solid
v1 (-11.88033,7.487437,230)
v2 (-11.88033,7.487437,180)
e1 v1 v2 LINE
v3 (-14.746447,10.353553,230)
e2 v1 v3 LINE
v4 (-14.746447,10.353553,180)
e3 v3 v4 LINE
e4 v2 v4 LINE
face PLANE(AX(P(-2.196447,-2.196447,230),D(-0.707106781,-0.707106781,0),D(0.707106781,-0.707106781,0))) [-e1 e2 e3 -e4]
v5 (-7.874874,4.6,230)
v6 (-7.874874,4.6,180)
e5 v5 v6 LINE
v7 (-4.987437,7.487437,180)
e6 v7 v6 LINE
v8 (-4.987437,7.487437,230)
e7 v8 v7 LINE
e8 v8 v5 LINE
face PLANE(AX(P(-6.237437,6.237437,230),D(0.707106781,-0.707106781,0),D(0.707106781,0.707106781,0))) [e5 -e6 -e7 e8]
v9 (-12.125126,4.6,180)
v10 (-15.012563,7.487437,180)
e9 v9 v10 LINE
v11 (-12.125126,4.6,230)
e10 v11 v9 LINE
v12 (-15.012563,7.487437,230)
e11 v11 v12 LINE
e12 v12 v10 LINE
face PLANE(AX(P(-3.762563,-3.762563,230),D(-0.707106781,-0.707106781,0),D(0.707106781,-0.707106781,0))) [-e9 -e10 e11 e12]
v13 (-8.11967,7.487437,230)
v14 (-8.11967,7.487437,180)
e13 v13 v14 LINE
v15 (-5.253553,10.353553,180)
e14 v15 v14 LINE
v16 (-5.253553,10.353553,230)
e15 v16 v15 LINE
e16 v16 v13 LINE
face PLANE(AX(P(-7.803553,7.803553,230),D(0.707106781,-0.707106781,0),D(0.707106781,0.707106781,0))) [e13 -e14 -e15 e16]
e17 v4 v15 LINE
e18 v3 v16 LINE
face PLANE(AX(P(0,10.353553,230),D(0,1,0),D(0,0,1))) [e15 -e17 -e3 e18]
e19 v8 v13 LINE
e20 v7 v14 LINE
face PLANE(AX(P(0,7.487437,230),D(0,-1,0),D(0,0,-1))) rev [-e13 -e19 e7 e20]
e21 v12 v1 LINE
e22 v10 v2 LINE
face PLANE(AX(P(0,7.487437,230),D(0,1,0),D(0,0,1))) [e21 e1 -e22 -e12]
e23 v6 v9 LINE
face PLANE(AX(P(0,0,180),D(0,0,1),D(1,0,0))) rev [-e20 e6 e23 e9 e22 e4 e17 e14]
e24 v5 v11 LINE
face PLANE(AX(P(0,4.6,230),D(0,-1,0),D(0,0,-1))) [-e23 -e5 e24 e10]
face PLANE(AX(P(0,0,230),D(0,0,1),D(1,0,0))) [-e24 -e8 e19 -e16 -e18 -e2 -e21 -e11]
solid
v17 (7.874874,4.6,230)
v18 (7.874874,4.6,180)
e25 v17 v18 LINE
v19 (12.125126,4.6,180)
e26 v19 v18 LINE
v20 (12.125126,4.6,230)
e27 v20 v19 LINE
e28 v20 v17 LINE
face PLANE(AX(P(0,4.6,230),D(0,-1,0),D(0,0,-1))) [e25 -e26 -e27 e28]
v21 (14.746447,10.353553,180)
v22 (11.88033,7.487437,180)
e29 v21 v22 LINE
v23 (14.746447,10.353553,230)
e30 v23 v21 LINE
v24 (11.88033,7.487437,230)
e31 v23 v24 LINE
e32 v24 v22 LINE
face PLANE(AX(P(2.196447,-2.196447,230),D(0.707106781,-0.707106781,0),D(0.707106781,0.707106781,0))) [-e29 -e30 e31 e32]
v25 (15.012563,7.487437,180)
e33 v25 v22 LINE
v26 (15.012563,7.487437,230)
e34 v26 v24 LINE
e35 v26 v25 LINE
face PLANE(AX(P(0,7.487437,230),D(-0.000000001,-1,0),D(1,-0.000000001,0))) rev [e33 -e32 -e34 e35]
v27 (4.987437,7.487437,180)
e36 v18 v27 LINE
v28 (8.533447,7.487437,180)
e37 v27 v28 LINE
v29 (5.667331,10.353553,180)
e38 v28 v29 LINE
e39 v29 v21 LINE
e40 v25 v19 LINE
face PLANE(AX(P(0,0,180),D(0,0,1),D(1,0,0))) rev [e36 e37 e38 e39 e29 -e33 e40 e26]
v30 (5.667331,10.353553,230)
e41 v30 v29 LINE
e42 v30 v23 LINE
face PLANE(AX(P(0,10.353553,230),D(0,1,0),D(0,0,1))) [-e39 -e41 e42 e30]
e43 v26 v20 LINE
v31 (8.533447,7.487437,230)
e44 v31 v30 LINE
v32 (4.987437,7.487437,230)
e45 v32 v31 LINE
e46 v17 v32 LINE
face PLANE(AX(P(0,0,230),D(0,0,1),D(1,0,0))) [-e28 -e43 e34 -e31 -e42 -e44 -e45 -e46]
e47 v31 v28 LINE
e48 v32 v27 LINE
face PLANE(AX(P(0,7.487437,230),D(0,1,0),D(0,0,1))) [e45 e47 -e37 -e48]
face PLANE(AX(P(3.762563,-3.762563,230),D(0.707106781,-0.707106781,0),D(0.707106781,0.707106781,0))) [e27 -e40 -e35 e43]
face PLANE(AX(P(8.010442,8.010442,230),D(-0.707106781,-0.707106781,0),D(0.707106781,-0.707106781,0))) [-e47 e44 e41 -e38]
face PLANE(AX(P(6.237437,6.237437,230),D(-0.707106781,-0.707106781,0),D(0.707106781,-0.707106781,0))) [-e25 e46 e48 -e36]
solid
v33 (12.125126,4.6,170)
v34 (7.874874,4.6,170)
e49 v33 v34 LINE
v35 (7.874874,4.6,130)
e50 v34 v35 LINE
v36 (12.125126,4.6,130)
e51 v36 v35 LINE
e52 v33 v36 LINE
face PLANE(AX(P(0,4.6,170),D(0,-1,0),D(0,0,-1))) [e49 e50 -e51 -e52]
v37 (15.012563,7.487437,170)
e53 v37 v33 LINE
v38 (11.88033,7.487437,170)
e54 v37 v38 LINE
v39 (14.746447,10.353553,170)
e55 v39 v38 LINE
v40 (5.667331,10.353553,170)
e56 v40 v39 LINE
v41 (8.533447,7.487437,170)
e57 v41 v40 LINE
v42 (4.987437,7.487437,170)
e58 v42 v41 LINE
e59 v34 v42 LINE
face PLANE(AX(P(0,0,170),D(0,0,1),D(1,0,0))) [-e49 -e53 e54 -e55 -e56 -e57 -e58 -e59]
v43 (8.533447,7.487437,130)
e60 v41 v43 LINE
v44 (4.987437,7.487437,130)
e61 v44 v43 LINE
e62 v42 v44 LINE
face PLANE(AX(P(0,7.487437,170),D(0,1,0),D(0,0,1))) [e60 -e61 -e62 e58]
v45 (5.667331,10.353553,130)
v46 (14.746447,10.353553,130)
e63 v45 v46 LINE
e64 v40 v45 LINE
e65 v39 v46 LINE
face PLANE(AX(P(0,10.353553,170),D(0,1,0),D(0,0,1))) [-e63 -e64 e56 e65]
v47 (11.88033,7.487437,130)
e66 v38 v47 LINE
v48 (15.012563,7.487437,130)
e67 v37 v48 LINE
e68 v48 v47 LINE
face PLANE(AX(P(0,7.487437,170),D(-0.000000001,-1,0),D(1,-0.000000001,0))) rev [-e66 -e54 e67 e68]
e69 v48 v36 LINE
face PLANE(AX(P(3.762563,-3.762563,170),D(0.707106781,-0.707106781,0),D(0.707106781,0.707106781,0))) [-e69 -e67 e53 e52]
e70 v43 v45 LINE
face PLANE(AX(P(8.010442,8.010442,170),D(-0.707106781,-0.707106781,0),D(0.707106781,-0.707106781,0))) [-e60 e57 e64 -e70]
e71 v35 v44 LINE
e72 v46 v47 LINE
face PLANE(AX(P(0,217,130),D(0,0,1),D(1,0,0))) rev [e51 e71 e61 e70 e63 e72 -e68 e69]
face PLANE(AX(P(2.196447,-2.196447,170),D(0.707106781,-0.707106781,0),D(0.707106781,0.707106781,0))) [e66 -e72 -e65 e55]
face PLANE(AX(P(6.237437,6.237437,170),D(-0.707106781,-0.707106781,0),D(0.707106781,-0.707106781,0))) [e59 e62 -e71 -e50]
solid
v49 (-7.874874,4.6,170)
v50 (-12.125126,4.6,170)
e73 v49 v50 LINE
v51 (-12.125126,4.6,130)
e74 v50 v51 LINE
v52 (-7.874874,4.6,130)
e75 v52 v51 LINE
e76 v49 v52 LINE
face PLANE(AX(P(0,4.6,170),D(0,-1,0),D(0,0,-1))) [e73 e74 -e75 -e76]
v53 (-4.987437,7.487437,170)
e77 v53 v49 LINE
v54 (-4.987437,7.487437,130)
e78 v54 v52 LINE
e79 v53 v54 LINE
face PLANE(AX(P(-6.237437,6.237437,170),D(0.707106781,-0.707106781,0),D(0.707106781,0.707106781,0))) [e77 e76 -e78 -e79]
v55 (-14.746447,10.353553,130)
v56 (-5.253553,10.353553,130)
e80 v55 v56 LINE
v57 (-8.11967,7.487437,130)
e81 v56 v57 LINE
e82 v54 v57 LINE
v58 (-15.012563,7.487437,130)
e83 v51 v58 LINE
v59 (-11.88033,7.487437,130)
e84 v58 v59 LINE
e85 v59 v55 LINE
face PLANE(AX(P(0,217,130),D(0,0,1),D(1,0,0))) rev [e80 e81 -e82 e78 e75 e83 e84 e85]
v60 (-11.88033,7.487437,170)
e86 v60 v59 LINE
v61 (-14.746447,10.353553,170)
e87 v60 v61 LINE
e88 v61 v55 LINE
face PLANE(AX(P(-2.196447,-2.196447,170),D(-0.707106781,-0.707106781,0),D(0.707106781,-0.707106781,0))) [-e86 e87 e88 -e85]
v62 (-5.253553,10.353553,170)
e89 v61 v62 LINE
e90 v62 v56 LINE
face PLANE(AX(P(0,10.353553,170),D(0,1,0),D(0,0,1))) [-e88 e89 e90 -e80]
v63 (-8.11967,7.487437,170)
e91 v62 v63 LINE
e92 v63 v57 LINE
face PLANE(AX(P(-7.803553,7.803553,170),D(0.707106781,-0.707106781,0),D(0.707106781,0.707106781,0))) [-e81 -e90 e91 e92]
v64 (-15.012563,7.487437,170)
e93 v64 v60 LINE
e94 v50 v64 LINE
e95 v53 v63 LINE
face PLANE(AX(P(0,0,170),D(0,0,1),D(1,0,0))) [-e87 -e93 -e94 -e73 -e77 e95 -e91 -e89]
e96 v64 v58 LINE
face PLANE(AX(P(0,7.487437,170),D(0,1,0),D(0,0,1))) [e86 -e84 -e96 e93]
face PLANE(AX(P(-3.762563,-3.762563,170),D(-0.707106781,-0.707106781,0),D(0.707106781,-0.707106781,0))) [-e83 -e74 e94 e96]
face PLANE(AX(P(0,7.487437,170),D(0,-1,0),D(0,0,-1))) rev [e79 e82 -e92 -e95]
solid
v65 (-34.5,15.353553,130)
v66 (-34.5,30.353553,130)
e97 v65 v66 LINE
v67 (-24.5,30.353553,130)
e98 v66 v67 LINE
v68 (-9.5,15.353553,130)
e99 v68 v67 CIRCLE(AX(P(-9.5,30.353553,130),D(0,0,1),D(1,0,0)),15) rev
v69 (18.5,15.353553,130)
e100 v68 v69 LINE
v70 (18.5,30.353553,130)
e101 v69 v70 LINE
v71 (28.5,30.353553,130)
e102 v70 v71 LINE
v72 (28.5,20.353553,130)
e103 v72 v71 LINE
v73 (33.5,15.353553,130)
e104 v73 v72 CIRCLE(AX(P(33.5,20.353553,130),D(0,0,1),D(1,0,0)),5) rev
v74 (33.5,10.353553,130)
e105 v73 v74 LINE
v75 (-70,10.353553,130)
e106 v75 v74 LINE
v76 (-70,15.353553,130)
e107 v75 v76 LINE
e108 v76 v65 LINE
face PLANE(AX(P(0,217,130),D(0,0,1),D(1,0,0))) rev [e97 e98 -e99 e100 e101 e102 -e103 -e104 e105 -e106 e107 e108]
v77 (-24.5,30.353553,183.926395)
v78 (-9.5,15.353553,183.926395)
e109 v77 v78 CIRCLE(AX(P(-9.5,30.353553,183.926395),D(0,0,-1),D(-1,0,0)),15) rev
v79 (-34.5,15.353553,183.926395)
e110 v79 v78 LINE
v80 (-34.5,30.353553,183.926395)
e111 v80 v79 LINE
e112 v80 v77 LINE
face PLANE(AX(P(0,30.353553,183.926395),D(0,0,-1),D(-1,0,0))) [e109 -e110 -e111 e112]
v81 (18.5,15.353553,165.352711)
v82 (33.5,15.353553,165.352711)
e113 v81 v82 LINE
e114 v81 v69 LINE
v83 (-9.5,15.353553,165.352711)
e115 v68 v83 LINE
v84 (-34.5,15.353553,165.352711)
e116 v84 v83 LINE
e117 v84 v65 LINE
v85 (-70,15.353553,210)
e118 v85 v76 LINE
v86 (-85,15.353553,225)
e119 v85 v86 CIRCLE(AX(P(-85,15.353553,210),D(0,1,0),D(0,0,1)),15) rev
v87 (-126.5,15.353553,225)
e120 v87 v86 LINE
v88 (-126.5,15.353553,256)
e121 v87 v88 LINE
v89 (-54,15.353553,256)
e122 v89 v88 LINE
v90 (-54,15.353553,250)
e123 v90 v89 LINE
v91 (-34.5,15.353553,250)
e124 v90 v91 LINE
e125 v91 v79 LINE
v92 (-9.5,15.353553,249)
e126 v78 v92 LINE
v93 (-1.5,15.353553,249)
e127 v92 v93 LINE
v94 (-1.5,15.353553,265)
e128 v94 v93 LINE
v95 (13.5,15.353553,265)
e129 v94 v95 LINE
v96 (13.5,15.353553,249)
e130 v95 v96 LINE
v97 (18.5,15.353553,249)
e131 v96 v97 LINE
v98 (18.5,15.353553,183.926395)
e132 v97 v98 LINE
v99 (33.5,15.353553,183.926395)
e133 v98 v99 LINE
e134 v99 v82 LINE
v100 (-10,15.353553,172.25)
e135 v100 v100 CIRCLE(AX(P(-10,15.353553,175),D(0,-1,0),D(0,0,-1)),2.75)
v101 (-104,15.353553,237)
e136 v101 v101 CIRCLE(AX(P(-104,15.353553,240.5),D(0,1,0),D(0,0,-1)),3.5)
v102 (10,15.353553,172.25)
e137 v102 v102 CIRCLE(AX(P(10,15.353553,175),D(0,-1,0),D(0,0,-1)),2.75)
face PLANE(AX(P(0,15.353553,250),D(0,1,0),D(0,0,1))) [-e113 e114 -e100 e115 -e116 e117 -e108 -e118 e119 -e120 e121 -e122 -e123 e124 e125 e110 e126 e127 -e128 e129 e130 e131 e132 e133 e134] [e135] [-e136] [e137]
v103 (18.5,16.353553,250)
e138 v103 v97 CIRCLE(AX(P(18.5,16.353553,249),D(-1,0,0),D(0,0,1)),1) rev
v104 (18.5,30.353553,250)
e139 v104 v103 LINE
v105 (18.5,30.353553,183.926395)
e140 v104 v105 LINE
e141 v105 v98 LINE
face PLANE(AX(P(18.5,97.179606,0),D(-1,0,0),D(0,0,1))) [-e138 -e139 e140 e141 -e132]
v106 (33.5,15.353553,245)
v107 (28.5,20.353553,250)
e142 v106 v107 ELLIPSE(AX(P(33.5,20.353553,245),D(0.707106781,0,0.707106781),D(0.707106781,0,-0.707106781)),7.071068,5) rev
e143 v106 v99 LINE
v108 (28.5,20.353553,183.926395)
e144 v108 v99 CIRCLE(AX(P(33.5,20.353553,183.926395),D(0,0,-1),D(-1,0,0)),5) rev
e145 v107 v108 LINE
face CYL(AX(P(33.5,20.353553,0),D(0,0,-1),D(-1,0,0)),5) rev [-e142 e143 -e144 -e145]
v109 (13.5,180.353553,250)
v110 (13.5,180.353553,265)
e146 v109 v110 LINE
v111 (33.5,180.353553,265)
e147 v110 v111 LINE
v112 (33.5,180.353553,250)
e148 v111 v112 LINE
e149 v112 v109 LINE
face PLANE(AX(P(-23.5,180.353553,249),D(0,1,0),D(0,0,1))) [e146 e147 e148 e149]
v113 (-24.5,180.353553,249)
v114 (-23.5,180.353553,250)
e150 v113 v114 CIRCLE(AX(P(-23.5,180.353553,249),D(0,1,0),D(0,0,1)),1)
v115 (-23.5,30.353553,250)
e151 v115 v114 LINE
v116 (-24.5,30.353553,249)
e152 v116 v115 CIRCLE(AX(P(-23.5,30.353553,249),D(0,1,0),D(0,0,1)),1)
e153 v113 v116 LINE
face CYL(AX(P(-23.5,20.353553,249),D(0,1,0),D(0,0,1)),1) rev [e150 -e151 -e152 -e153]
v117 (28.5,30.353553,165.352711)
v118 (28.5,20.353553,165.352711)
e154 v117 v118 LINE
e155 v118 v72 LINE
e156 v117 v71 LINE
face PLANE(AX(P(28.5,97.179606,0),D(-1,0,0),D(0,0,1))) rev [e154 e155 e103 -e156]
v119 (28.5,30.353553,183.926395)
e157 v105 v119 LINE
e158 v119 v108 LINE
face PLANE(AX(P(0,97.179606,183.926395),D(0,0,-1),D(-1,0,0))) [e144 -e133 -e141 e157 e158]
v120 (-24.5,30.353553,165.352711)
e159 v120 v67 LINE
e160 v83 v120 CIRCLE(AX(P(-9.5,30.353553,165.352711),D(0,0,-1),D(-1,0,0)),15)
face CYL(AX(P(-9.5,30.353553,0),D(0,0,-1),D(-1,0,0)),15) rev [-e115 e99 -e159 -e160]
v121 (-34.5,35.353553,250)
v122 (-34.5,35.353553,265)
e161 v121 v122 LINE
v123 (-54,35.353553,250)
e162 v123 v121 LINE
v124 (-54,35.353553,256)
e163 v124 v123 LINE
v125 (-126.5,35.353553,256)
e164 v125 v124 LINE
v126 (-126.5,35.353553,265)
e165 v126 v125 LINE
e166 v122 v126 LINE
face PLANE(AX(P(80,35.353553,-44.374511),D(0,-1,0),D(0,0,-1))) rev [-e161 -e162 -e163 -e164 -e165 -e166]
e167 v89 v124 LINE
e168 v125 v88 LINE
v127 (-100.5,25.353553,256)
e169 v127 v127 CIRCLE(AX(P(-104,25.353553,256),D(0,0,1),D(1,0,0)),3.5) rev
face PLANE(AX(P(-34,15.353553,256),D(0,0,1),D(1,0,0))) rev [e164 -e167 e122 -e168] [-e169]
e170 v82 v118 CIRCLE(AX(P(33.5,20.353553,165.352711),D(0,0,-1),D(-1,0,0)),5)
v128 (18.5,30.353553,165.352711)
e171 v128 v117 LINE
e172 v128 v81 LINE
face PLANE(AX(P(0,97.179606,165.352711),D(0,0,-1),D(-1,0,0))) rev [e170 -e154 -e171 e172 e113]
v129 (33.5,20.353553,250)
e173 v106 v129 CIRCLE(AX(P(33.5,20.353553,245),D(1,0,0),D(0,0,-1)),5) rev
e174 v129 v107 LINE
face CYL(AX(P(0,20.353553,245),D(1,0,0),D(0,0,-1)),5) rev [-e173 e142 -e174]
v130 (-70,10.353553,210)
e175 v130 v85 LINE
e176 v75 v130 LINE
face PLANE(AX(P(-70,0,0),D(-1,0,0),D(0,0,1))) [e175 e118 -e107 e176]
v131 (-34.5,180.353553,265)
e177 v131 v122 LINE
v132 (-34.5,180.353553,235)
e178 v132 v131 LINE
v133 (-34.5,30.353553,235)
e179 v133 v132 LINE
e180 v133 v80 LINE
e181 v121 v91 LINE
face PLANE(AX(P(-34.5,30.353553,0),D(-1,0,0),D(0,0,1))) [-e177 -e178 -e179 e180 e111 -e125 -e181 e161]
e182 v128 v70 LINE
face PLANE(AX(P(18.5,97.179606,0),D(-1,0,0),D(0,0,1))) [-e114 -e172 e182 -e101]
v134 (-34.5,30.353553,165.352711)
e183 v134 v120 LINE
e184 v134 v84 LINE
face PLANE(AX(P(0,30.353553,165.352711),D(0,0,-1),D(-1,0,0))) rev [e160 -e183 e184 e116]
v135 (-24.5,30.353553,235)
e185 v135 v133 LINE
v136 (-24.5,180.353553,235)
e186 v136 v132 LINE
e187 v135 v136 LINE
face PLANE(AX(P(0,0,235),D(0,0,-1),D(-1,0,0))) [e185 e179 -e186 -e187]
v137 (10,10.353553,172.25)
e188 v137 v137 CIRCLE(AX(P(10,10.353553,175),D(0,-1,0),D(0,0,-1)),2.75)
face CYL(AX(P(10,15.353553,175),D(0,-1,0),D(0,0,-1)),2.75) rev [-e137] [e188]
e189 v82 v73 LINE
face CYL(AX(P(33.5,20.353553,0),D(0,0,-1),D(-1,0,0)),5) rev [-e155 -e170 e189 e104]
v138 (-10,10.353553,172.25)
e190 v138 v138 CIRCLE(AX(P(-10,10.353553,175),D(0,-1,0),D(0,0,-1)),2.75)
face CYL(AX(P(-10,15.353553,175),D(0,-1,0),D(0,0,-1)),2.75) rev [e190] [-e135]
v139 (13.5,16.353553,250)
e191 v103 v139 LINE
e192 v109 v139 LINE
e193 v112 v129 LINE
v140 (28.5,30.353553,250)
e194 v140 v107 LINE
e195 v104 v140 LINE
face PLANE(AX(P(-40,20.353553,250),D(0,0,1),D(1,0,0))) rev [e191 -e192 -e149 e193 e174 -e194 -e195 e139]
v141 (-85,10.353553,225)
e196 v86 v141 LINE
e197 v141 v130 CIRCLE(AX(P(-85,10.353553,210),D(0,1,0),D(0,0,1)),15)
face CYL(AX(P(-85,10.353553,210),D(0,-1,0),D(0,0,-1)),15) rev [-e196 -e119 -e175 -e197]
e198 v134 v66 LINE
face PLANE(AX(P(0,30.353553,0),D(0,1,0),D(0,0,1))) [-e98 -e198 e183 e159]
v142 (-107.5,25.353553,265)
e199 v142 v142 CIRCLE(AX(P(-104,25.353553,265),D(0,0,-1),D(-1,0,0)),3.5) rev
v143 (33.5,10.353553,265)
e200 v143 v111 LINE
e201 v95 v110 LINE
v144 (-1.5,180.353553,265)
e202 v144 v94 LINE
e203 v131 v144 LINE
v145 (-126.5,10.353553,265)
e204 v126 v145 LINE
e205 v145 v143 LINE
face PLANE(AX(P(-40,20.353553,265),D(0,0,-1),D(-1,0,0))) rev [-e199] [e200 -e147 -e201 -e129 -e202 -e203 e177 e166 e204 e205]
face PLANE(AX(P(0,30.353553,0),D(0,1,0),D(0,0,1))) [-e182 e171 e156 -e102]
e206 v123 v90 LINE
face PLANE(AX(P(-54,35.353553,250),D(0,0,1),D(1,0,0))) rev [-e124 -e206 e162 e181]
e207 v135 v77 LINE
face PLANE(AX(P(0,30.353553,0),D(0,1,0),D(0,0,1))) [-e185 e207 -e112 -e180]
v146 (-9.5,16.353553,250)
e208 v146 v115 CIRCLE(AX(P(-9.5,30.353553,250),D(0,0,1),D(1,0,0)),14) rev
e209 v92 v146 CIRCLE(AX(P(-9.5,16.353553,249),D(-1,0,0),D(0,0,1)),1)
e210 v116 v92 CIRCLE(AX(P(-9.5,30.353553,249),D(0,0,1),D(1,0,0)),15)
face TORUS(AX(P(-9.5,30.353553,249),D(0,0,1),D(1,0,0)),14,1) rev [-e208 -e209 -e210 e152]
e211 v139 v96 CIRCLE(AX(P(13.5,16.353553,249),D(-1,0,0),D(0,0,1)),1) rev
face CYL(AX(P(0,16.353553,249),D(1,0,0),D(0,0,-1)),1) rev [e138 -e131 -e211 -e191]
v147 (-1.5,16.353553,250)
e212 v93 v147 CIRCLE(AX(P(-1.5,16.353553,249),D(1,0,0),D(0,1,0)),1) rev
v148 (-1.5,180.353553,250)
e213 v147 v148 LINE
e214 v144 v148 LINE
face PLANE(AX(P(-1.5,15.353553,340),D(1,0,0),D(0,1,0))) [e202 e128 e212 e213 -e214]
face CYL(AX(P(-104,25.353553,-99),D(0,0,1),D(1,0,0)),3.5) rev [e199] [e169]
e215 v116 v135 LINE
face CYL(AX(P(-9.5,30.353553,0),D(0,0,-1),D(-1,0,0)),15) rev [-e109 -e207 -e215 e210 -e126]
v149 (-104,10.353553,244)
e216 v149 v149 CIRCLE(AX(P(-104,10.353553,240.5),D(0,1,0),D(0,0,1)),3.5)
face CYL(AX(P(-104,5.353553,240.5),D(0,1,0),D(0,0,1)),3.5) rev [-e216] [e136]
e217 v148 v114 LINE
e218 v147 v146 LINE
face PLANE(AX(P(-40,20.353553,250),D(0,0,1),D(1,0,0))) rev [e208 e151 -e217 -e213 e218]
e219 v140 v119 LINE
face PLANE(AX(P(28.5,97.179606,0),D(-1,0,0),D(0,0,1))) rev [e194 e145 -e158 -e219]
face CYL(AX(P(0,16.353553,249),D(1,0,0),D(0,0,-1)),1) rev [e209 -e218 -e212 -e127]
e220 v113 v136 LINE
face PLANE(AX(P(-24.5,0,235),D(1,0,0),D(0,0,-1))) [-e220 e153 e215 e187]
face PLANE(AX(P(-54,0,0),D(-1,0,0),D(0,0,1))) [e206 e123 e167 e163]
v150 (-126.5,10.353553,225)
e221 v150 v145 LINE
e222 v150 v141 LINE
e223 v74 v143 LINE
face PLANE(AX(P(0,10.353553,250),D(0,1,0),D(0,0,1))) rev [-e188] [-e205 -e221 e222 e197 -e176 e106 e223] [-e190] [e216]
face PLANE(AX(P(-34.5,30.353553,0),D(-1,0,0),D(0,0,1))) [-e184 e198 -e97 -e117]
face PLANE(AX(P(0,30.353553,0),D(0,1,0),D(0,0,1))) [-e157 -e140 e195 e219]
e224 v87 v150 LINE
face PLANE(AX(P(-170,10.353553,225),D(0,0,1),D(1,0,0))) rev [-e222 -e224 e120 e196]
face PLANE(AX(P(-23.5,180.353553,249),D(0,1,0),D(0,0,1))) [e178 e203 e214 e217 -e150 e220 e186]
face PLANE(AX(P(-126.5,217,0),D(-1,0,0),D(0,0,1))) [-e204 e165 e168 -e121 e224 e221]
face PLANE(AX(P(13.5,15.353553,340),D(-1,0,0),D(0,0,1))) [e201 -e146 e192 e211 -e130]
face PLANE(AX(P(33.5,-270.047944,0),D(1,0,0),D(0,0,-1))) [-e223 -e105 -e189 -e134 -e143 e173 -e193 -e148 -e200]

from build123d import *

# Parameters (mm, degrees)
BOSS_EXTRUDE1_DEPTH      = 250
BOSS_EXTRUDE2_DEPTH      = 50
BOSS_EXTRUDE2_2_DEPTH    = 50
LPATTERN1_COUNT          = 4
LPATTERN1_PITCH          = 60
SKETCH2_R                = 2.75
CUT_EXTRUDE1_DEPTH       = 251.864711302
UPPER_ACRYLIC_SUPP_W     = 20
UPPER_ACRYLIC_SUPP_H     = 250
BOSS_EXTRUDE3_DEPTH      = 5
UPPER_ACRYLIC_SUPP_3_W   = 10
UPPER_ACRYLIC_SUPP_3_H   = 66.073604859
UPPER_ACRYLIC_SUPP_3_H_2 = 41.475217291
UPPER_ACRYLIC_SUPP_3_H_3 = 42.557179481
UPPER_ACRYLIC_SUPP_3_H_4 = 45.558340935
BOSS_EXTRUDE4_DEPTH      = 15
FILLET1_R                = 15
SKETCH4_W                = 60
SKETCH4_H                = 15
BOSS_EXTRUDE5_DEPTH      = 5
SKETCH4_3_W              = 60
SKETCH4_3_H              = 15
BOSS_EXTRUDE6_DEPTH      = 60
SKETCH5_W                = 10
SKETCH5_H                = 45
BOSS_EXTRUDE7_DEPTH      = 15
BOSS_EXTRUDE8_START      = 250
SKETCH5_3_W              = 10
SKETCH5_3_H              = 45
BOSS_EXTRUDE8_DEPTH      = 15
FILLET2_R                = 1
SKETCH6_W                = 6
SKETCH6_H                = 60
CUT_EXTRUDE2_DEPTH       = 6
BOSS_EXTRUDE9_DEPTH      = 30
SKETCH8_W                = 333.602701612
SKETCH8_H                = 59.031331047
CUT_EXTRUDE3_DEPTH       = 150
SKETCH9_W                = 6
SKETCH9_H                = 20
CLOTH_ESCAPE_GAP_DEPTH   = 20
SKETCH11_W               = 9
SKETCH11_H               = 20
BOSS_EXTRUDE11_DEPTH     = 100
CUT_EXTRUDE4_DEPTH       = 68
SKETCH13_W               = 40
SKETCH13_H               = 5
BOSS_EXTRUDE13_DEPTH     = 100
CUT_EXTRUDE5_DEPTH       = 100
FILLET3_R                = 15
BOSS_EXTRUDE14_START     = -5
BOSS_EXTRUDE14_DEPTH     = 25
CUT_EXTRUDE6_DEPTH       = 30
CUT_EXTRUDE6_DEPTH_BACK  = 10
SKETCH16_5_W             = 8.5
SKETCH16_5_H             = 41.475217291
SKETCH16_5_H_2           = 42.557179481
SKETCH16_5_W_2           = 1.5
SKETCH16_5_H_3           = 42.177819043
SKETCH16_5_H_4           = 20.831100018
SKETCH16_5_H_5           = 17.311395043
SKETCH16_5_H_6           = 18.573684265
SKETCH16_5_H_7           = 65.073604859
SKETCH16_6_W             = 8.5
SKETCH16_6_H             = 41.475217291
SKETCH16_6_H_2           = 42.557179481
SKETCH16_6_W_2           = 1.5
SKETCH16_6_H_3           = 42.177819043
SKETCH16_6_H_4           = 20.831100018
SKETCH16_6_H_5           = 17.311395043
SKETCH16_6_H_6           = 18.573684265
SKETCH16_6_H_7           = 65.073604859
BOSS_EXTRUDE15_DEPTH     = 5
BOSS_EXTRUDE16_DEPTH     = 20
SKETCH16_8_W             = 8.5
SKETCH16_8_H             = 41.475217291
SKETCH16_8_H_2           = 42.557179481
SKETCH16_8_W_2           = 1.5
SKETCH16_8_H_3           = 42.177819043
SKETCH16_8_H_4           = 65.073604859
BOSS_EXTRUDE17_DEPTH     = 15
BOSS_EXTRUDE18_START     = -5
BOSS_EXTRUDE18_DEPTH     = 25
FILLET4_R                = 5
BOSS_EXTRUDE21_START     = 145
BOSS_EXTRUDE21_DEPTH     = 170
SKETCH19_R               = 3.5
CUT_EXTRUDE7_DEPTH       = 10
CUT_EXTRUDE8_DEPTH       = 355
CUT_EXTRUDE8_DEPTH_BACK  = 10
SKETCH20_R               = 3.5
SKETCH21_W               = 15
SKETCH21_H               = 197.501027769
CUT_EXTRUDE9_DEPTH       = 340
SKETCH22_W               = 160
SKETCH22_H               = 10
SKETCH22_H_2             = 135
CUT_EXTRUDE11_DEPTH      = 217


with BuildPart() as part:
    # profile → Boss-Extrude1 (new body)
    with BuildSketch(Plane.XY):
        Polygon((-14.746446609, 10.353553391), (-5.253553391, 10.353553391), (5.667330529, 10.353553391), (14.746446609, 10.353553391), (20, 10.353553391), (20, 15.353553391), (-20, 15.353553391), (-20, 10.353553391), align=None)
    extrude(amount=BOSS_EXTRUDE1_DEPTH)

    # Sketch2 → Cut-Extrude1 (cut, through all)
    with BuildSketch(Plane.XZ.offset(-10.353553391)):
        with Locations(Location((-10, 175, 0), (0, 0, 270))):
            Circle(SKETCH2_R)
        with Locations(Location((10, 175, 0), (0, 0, 270))):
            Circle(SKETCH2_R)
        with Locations(Location((-10, 115, 0), (0, 0, 270))):
            Circle(SKETCH2_R)
        with Locations(Location((10, 115, 0), (0, 0, 270))):
            Circle(SKETCH2_R)
        with Locations(Location((-10, 55, 0), (0, 0, 270))):
            Circle(SKETCH2_R)
        with Locations(Location((10, 55, 0), (0, 0, 270))):
            Circle(SKETCH2_R)
    extrude(amount=-CUT_EXTRUDE1_DEPTH, mode=Mode.SUBTRACT)

    # upper_acrylic_supp → Boss-Extrude3 (add)
    with BuildSketch(Plane(origin=(0, 15.353553391, 0), x_dir=(1, 0, 0), z_dir=(0, 1, 0))):
        with Locations((-30, -125)):
            Rectangle(UPPER_ACRYLIC_SUPP_W, UPPER_ACRYLIC_SUPP_H)
    extrude(amount=-BOSS_EXTRUDE3_DEPTH)

    # upper_acrylic_supp<3> → Boss-Extrude4 (add)
    with BuildSketch(Plane(origin=(0, 15.353553391, 0), x_dir=(1, 0, 0), z_dir=(0, 1, 0))):
        with Locations((-29.5, -216.963197571)):
            Rectangle(UPPER_ACRYLIC_SUPP_3_W, UPPER_ACRYLIC_SUPP_3_H)
        with Locations((-29.5, -144.615102231)):
            Rectangle(UPPER_ACRYLIC_SUPP_3_W, UPPER_ACRYLIC_SUPP_3_H_2)
        with Locations((-29.5, -85.287508801)):
            Rectangle(UPPER_ACRYLIC_SUPP_3_W, UPPER_ACRYLIC_SUPP_3_H_3)
        with Locations((-29.5, -22.779170468)):
            Rectangle(UPPER_ACRYLIC_SUPP_3_W, UPPER_ACRYLIC_SUPP_3_H_4)
    extrude(amount=BOSS_EXTRUDE4_DEPTH)

    # Fillet1
    fillet1_edges = [part.edges().sort_by_distance(p)[0] for p in [
        (-24.5, 15.353553391, 22.779170467),
        (-24.5, 15.353553391, 85.287508801),
        (-24.5, 15.353553391, 144.615102231),
        (-24.5, 15.353553391, 216.963197571),
    ]]
    fillet(fillet1_edges, radius=FILLET1_R - 0.0001)  # a hair under: the kernel refuses the full size



with BuildPart() as body_2:
    # Sketch1<3> → Boss-Extrude2 (new body)
    with BuildSketch(Plane.XY):
        Polygon((-7.253553391, 8.353553391), (-8.119669914, 7.487436867), (-5.5, 7.487436867), (-4.987436867, 7.487436867), (-5.5, 6.974873734), (-7.874873734, 4.6), (-12.125126266, 4.6), (-14.5, 6.974873734), (-15.012563133, 7.487436867), (-14.5, 7.487436867), (-11.880330086, 7.487436867), (-12.746446609, 8.353553391), (-14.746446609, 10.353553391), (-5.253553391, 10.353553391), align=None)
    boss_extrude2 = extrude(amount=BOSS_EXTRUDE2_DEPTH)


with BuildPart() as body_3:
    # Sketch1<3> → Boss-Extrude2 2 (new body)
    with BuildSketch(Plane.XY):
        Polygon((12.746446609, 8.353553391), (11.880330086, 7.487436867), (14.5, 7.487436867), (15.012563133, 7.487436867), (14.5, 6.974873734), (12.125126266, 4.6), (7.874873734, 4.6), (5.5, 6.974873734), (4.987436867, 7.487436867), (5.5, 7.487436867), (8.533447053, 7.487436867), (7.667330529, 8.353553391), (5.667330529, 10.353553391), (14.746446609, 10.353553391), align=None)
    boss_extrude2_2 = extrude(amount=BOSS_EXTRUDE2_2_DEPTH)


with BuildPart() as lpattern1_1:
    # LPattern1: pattern copy
    add(boss_extrude2.moved(Location(Vector(0, 0, 1) * (1 * LPATTERN1_PITCH))))


with BuildPart() as lpattern1_2:
    # LPattern1: pattern copy
    add(boss_extrude2.moved(Location(Vector(0, 0, 1) * (2 * LPATTERN1_PITCH))))


with BuildPart() as lpattern1_3:
    # LPattern1: pattern copy
    add(boss_extrude2.moved(Location(Vector(0, 0, 1) * (3 * LPATTERN1_PITCH))))


with BuildPart() as lpattern1_4:
    # LPattern1: pattern copy
    add(boss_extrude2_2.moved(Location(Vector(0, 0, 1) * (1 * LPATTERN1_PITCH))))


with BuildPart() as lpattern1_5:
    # LPattern1: pattern copy
    add(boss_extrude2_2.moved(Location(Vector(0, 0, 1) * (2 * LPATTERN1_PITCH))))


with BuildPart() as lpattern1_6:
    # LPattern1: pattern copy
    add(boss_extrude2_2.moved(Location(Vector(0, 0, 1) * (3 * LPATTERN1_PITCH))))


with BuildPart() as part_1:
    add(part.part)

    add(body_2.part)  # Boss-Extrude5 merges body 2

    add(body_3.part)  # Boss-Extrude5 merges body 3
    # Sketch4 → Boss-Extrude5 (add, symmetric)
    with BuildSketch(Plane(origin=(0, 15.353553391, 0), x_dir=(1, 0, 0), z_dir=(0, 1, 0))):
        with Locations((-10, -257.5)):
            Rectangle(SKETCH4_W, SKETCH4_H)
        with Locations((-10, 7.5)):
            Rectangle(SKETCH4_W, SKETCH4_H)
    extrude(amount=BOSS_EXTRUDE5_DEPTH, both=True)

    # Sketch4<3> → Boss-Extrude6 (add)
    with BuildSketch(Plane(origin=(0, 15.353553391, 0), x_dir=(1, 0, 0), z_dir=(0, 1, 0))):
        with Locations((-10, -257.5)):
            Rectangle(SKETCH4_3_W, SKETCH4_3_H)
        with Locations((-10, 7.5)):
            Rectangle(SKETCH4_3_W, SKETCH4_3_H)
    extrude(amount=BOSS_EXTRUDE6_DEPTH)

    # Sketch5 → Boss-Extrude7 (add)
    with BuildSketch(Plane(origin=(0, 0, 250), x_dir=(-1, 0, 0), z_dir=(0, 0, -1))):
        with Locations((29.5, 52.853553391)):
            Rectangle(SKETCH5_W, SKETCH5_H)
    extrude(amount=BOSS_EXTRUDE7_DEPTH)

    # Sketch5<3> → Boss-Extrude8 (add)
    with BuildSketch(Plane(origin=(0, 0, 250), x_dir=(-1, 0, 0), z_dir=(0, 0, -1)).offset(BOSS_EXTRUDE8_START)):
        with Locations((29.5, 52.853553391)):
            Rectangle(SKETCH5_3_W, SKETCH5_3_H)
    extrude(amount=-BOSS_EXTRUDE8_DEPTH)

    # Fillet2
    fillet2_edges = [part_1.edges().sort_by_distance(p)[0] for p in [
        (-24.5, 52.853503391, 250),
        (-24.5, 52.853503391, 0),
        (5.24995, 15.353553391, 250),
        (-20.106631007, 19.746922384, 250),
        (-20.106631007, 19.746922384, 0),
        (5.24995, 15.353553391, 0),
    ]]
    fillet(fillet2_edges, radius=FILLET2_R)

    # Sketch6 → Cut-Extrude2 (cut)
    with BuildSketch(Plane.ZY.offset(40)):
        with Locations((253, 45.353553391)):
            Rectangle(SKETCH6_W, SKETCH6_H)
        with Locations((-3, 45.353553391)):
            Rectangle(SKETCH6_W, SKETCH6_H)
    extrude(amount=-CUT_EXTRUDE2_DEPTH, mode=Mode.SUBTRACT)

    # Sketch7 → Boss-Extrude9 (add)
    with BuildSketch(Plane.ZY.offset(40)):
        Polygon((265, 75.353553391), (256, 75.353553391), (256, 15.353553391), (-6, 15.353553391), (-6, 75.353553391), (-15, 75.353553391), (-15, 10.353553391), (265, 10.353553391), align=None)
    extrude(amount=BOSS_EXTRUDE9_DEPTH)

    # Sketch8 → Cut-Extrude3 (cut)
    with BuildSketch(Plane.ZY.offset(70)):
        with Locations((122.426839416, 64.869218915)):
            Rectangle(SKETCH8_W, SKETCH8_H)
    extrude(amount=-CUT_EXTRUDE3_DEPTH, mode=Mode.SUBTRACT)

    # Sketch9 → cloth_escape_gap (add)
    with BuildSketch(Plane.ZY.offset(34)):
        with Locations((253, 25.353553391)):
            Rectangle(SKETCH9_W, SKETCH9_H)
        with Locations((-3, 25.353553391)):
            Rectangle(SKETCH9_W, SKETCH9_H)
    extrude(amount=CLOTH_ESCAPE_GAP_DEPTH)

    # Sketch11 → Boss-Extrude11 (add)
    with BuildSketch(Plane.ZY.offset(70)):
        with Locations((-10.5, 25.353553391)):
            Rectangle(SKETCH11_W, SKETCH11_H)
        with Locations((260.5, 25.353553391)):
            Rectangle(SKETCH11_W, SKETCH11_H)
    extrude(amount=BOSS_EXTRUDE11_DEPTH)

    # Sketch12 → Cut-Extrude4 (cut)
    with BuildSketch(Plane.XZ.offset(-10.353553391)):
        Polygon((-170, 265), (-70, 265), (-170, 260.5), align=None)
        Polygon((-70, -15), (-170, -10.5), (-170, -15), align=None)
    extrude(amount=-CUT_EXTRUDE4_DEPTH, mode=Mode.SUBTRACT)

    # Sketch13 → Boss-Extrude13 (add)
    with BuildSketch(Plane.ZY.offset(70)):
        with Locations((5, 12.853553391)):
            Rectangle(SKETCH13_W, SKETCH13_H)
        with Locations((245, 12.853553391)):
            Rectangle(SKETCH13_W, SKETCH13_H)
    extrude(amount=BOSS_EXTRUDE13_DEPTH)

    # Sketch14 → Cut-Extrude5 (cut)
    with BuildSketch(Plane(origin=(0, 15.353553391, 0), x_dir=(1, 0, 0), z_dir=(0, 1, 0))):
        Polygon((-70, -265), (-170, -260.5), (-170, -265), align=None)
        Polygon((-170, 15), (-170, 10.5), (-70, 15), align=None)
    extrude(amount=-CUT_EXTRUDE5_DEPTH, mode=Mode.SUBTRACT)

    # Fillet3
    fillet3_edges = [part_1.edges().sort_by_distance(p)[0] for p in [
        (-70, 12.853553391, 25),
        (-70, 12.853553391, 225),
    ]]
    fillet(fillet3_edges, radius=FILLET3_R)

    # Sketch16 → Boss-Extrude14 (add)
    with BuildSketch(Plane(origin=(0, 15.353553391, 0), x_dir=(1, 0, 0), z_dir=(0, 1, 0)).offset(BOSS_EXTRUDE14_START)):
        Polygon((28.5, 0), (33.5, 0), (33.5, 15), (18.5, 15), (18.5, 0), align=None)
        Polygon((18.5, -250), (18.5, -265), (33.5, -265), (33.5, -250), (28.5, -250), align=None)
    extrude(amount=BOSS_EXTRUDE14_DEPTH)

    # Sketch16<5> → Cut-Extrude6 (cut, two sides: drawn at the far end of the back side and taken through both)
    with BuildSketch(Plane(origin=(0, 15.353553391, 0), x_dir=(1, 0, 0), z_dir=(0, 1, 0)).offset(-CUT_EXTRUDE6_DEPTH_BACK)):
        Polygon((18.5, -250), (18.5, -265), (33.5, -265), (33.5, -250), (28.5, -250), align=None)
        Polygon((28.5, -250), (33.5, -250), (33.5, 0), (28.5, 0), (28.5, -43.177819043), (20, -43.177819043), (20, -64.008919061), (28.5, -64.008919061), (28.5, -106.566098542), (20, -106.566098542), (20, -123.877493585), (28.5, -123.877493585), (28.5, -165.352710876), (20, -165.352710876), (20, -183.926395141), (28.5, -183.926395141), align=None)
        with Locations((24.25, -144.615102231)):
            Rectangle(SKETCH16_5_W, SKETCH16_5_H)
        with Locations((24.25, -85.287508801)):
            Rectangle(SKETCH16_5_W, SKETCH16_5_H_2)
        Polygon((28.5, -43.177819043), (28.5, 0), (18.5, 0), (18.5, -1), (20, -1), (20, -43.177819043), align=None)
        Polygon((28.5, 0), (33.5, 0), (33.5, 15), (18.5, 15), (18.5, 0), align=None)
        with Locations((19.25, -22.088909521)):
            Rectangle(SKETCH16_5_W_2, SKETCH16_5_H_3)
        with Locations((19.25, -53.593369052)):
            Rectangle(SKETCH16_5_W_2, SKETCH16_5_H_4)
        with Locations((19.25, -85.287508801)):
            Rectangle(SKETCH16_5_W_2, SKETCH16_5_H_2)
        with Locations((19.25, -115.221796064)):
            Rectangle(SKETCH16_5_W_2, SKETCH16_5_H_5)
        with Locations((19.25, -144.615102231)):
            Rectangle(SKETCH16_5_W_2, SKETCH16_5_H)
        with Locations((19.25, -174.639553009)):
            Rectangle(SKETCH16_5_W_2, SKETCH16_5_H_6)
        with Locations((19.25, -216.463197571)):
            Rectangle(SKETCH16_5_W_2, SKETCH16_5_H_7)
        Polygon((18.5, -249), (18.5, -250), (28.5, -250), (28.5, -183.926395141), (20, -183.926395141), (20, -249), align=None)
    extrude(amount=CUT_EXTRUDE6_DEPTH + CUT_EXTRUDE6_DEPTH_BACK, mode=Mode.SUBTRACT)

    # Sketch16<6> → Boss-Extrude15 (add)
    with BuildSketch(Plane(origin=(0, 15.353553391, 0), x_dir=(1, 0, 0), z_dir=(0, 1, 0))):
        Polygon((28.5, -250), (33.5, -250), (33.5, 0), (28.5, 0), (28.5, -43.177819043), (20, -43.177819043), (20, -64.008919061), (28.5, -64.008919061), (28.5, -106.566098542), (20, -106.566098542), (20, -123.877493585), (28.5, -123.877493585), (28.5, -165.352710876), (20, -165.352710876), (20, -183.926395141), (28.5, -183.926395141), align=None)
        Polygon((18.5, -249), (18.5, -250), (28.5, -250), (28.5, -183.926395141), (20, -183.926395141), (20, -249), align=None)
        Polygon((18.5, -250), (18.5, -265), (33.5, -265), (33.5, -250), (28.5, -250), align=None)
        with Locations((24.25, -144.615102231)):
            Rectangle(SKETCH16_6_W, SKETCH16_6_H)
        with Locations((24.25, -85.287508801)):
            Rectangle(SKETCH16_6_W, SKETCH16_6_H_2)
        Polygon((28.5, -43.177819043), (28.5, 0), (18.5, 0), (18.5, -1), (20, -1), (20, -43.177819043), align=None)
        Polygon((28.5, 0), (33.5, 0), (33.5, 15), (18.5, 15), (18.5, 0), align=None)
        with Locations((19.25, -22.088909521)):
            Rectangle(SKETCH16_6_W_2, SKETCH16_6_H_3)
        with Locations((19.25, -53.593369052)):
            Rectangle(SKETCH16_6_W_2, SKETCH16_6_H_4)
        with Locations((19.25, -85.287508801)):
            Rectangle(SKETCH16_6_W_2, SKETCH16_6_H_2)
        with Locations((19.25, -115.221796064)):
            Rectangle(SKETCH16_6_W_2, SKETCH16_6_H_5)
        with Locations((19.25, -144.615102231)):
            Rectangle(SKETCH16_6_W_2, SKETCH16_6_H)
        with Locations((19.25, -174.639553009)):
            Rectangle(SKETCH16_6_W_2, SKETCH16_6_H_6)
        with Locations((19.25, -216.463197571)):
            Rectangle(SKETCH16_6_W_2, SKETCH16_6_H_7)
    extrude(amount=-BOSS_EXTRUDE15_DEPTH)

    # Sketch16<7> → Boss-Extrude16 (add)
    with BuildSketch(Plane(origin=(0, 15.353553391, 0), x_dir=(1, 0, 0), z_dir=(0, 1, 0))):
        Polygon((18.5, -250), (18.5, -265), (33.5, -265), (33.5, -250), (28.5, -250), align=None)
        Polygon((28.5, 0), (33.5, 0), (33.5, 15), (18.5, 15), (18.5, 0), align=None)
    extrude(amount=BOSS_EXTRUDE16_DEPTH)

    # Sketch16<8> → Boss-Extrude17 (add)
    with BuildSketch(Plane(origin=(0, 15.353553391, 0), x_dir=(1, 0, 0), z_dir=(0, 1, 0))):
        Polygon((18.5, -249), (18.5, -250), (28.5, -250), (28.5, -183.926395141), (20, -183.926395141), (20, -249), align=None)
        with Locations((24.25, -144.615102231)):
            Rectangle(SKETCH16_8_W, SKETCH16_8_H)
        with Locations((24.25, -85.287508801)):
            Rectangle(SKETCH16_8_W, SKETCH16_8_H_2)
        Polygon((28.5, -43.177819043), (28.5, 0), (18.5, 0), (18.5, -1), (20, -1), (20, -43.177819043), align=None)
        with Locations((19.25, -22.088909521)):
            Rectangle(SKETCH16_8_W_2, SKETCH16_8_H_3)
        with Locations((19.25, -85.287508801)):
            Rectangle(SKETCH16_8_W_2, SKETCH16_8_H_2)
        with Locations((19.25, -144.615102231)):
            Rectangle(SKETCH16_8_W_2, SKETCH16_8_H)
        with Locations((19.25, -216.463197571)):
            Rectangle(SKETCH16_8_W_2, SKETCH16_8_H_4)
    extrude(amount=BOSS_EXTRUDE17_DEPTH)

    # Sketch14<2> → Boss-Extrude18 (add)
    with BuildSketch(Plane(origin=(0, 15.353553391, 0), x_dir=(1, 0, 0), z_dir=(0, 1, 0)).offset(BOSS_EXTRUDE18_START)):
        Polygon((-70, -265), (-170, -260.5), (-170, -265), align=None)
        Polygon((-170, 15), (-170, 10.5), (-70, 15), align=None)
    extrude(amount=BOSS_EXTRUDE18_DEPTH)

    # Fillet4
    fillet4_edges = [part_1.edges().sort_by_distance(p)[0] for p in [
        (31, 15.353553391, 0),
        (28.5, 15.353553391, 21.588909521),
        (28.5, 15.353553391, 85.287508801),
        (28.5, 15.353553391, 144.615102231),
        (31, 15.353553391, 250),
        (28.5, 15.353553391, 216.963197571),
    ]]
    fillet(fillet4_edges, radius=FILLET4_R - 0.0001)  # a hair under: the kernel refuses the full size

    # Sketch18 → Boss-Extrude21 (add)
    with BuildSketch(Plane(origin=(0, 35.353553391, 0), x_dir=(1, 0, 0), z_dir=(0, 1, 0)).offset(BOSS_EXTRUDE21_START)):
        with BuildLine():
            Line((-34.5, -250), (-34.5, -265))
            Line((-34.5, -265), (33.5, -265))
            Line((33.5, -265), (33.5, -250))
            Line((33.5, -250), (-23.5, -250))
            ThreePointArc((-23.5, -250), (-24.207106781, -249.707106781), (-24.5, -249))
            Line((-24.5, -249), (-24.5, -235))
            Line((-24.5, -235), (-34.5, -235))
            Line((-34.5, -235), (-34.5, -250))
        make_face()
        with BuildLine():
            Line((-34.5, 15), (-34.5, 0))
            Line((-34.5, 0), (-34.5, -15))
            Line((-34.5, -15), (-24.5, -15))
            Line((-24.5, -15), (-24.5, -1))
            ThreePointArc((-24.5, -1), (-24.207106781, -0.292893219), (-23.5, 0))
            Line((-23.5, 0), (33.5, 0))
            Line((33.5, 0), (33.5, 15))
            Line((33.5, 15), (-34.5, 15))
        make_face()
    extrude(amount=-BOSS_EXTRUDE21_DEPTH)

    # Sketch19 → Cut-Extrude7 (cut)
    with BuildSketch(Plane(origin=(0, 15.353553391, 0), x_dir=(1, 0, 0), z_dir=(0, 1, 0))):
        with Locations(Location((-154, -9.5, 0), (0, 0, 270))):
            Circle(SKETCH19_R)
        with Locations(Location((-104, -9.5, 0), (0, 0, 270))):
            Circle(SKETCH19_R)
        with Locations(Location((-104, -240.5, 0), (0, 0, 270))):
            Circle(SKETCH19_R)
        with Locations(Location((-154, -240.5, 0), (0, 0, 270))):
            Circle(SKETCH19_R)
    extrude(amount=-CUT_EXTRUDE7_DEPTH, mode=Mode.SUBTRACT)

    # Sketch20 → Cut-Extrude8 (cut, two sides: drawn at the far end of the back side and taken through both)
    with BuildSketch(Plane(origin=(0, 0, 256), x_dir=(-1, 0, 0), z_dir=(0, 0, -1)).offset(-CUT_EXTRUDE8_DEPTH_BACK)):
        with Locations(Location((104, 25.353553391, 0), (0, 0, 180))):
            Circle(SKETCH20_R)
        with Locations(Location((154, 25.353553391, 0), (0, 0, 180))):
            Circle(SKETCH20_R)
    extrude(amount=CUT_EXTRUDE8_DEPTH + CUT_EXTRUDE8_DEPTH_BACK, mode=Mode.SUBTRACT)

    # Sketch21 → Cut-Extrude9 (cut)
    with BuildSketch(Plane.XY):
        with Locations((6, 114.104067276)):
            Rectangle(SKETCH21_W, SKETCH21_H)
    extrude(amount=CUT_EXTRUDE9_DEPTH, mode=Mode.SUBTRACT)


with BuildPart() as cut_extrude11_tool:
    # Sketch22 → Cut-Extrude11 (new body)
    with BuildSketch(Plane(origin=(0, 0, 0), x_dir=(1, 0, 0), z_dir=(0, 1, 0))):
        Polygon((-126.5, 15), (-186.5, 15), (-186.5, -265), (-126.5, -265), (-126.5, -130), (-126.5, -120), align=None)
        with Locations((-46.5, -125)):
            Rectangle(SKETCH22_W, SKETCH22_H)
        with Locations((-46.5, -52.5)):
            Rectangle(SKETCH22_W, SKETCH22_H_2)
    extrude(amount=CUT_EXTRUDE11_DEPTH)


with BuildPart() as part_2:
    add(part_1.part)

    # Cut-Extrude11: cut by cut_extrude11_tool
    add(cut_extrude11_tool.part, mode=Mode.SUBTRACT)


with BuildPart() as lpattern1_1_1:
    add(lpattern1_1.part)

    # Cut-Extrude11: cut by cut_extrude11_tool
    add(cut_extrude11_tool.part, mode=Mode.SUBTRACT)


with BuildPart() as lpattern1_2_1:
    add(lpattern1_2.part)

    # Cut-Extrude11: cut by cut_extrude11_tool
    add(cut_extrude11_tool.part, mode=Mode.SUBTRACT)


with BuildPart() as lpattern1_4_1:
    add(lpattern1_4.part)

    # Cut-Extrude11: cut by cut_extrude11_tool
    add(cut_extrude11_tool.part, mode=Mode.SUBTRACT)


with BuildPart() as lpattern1_5_1:
    add(lpattern1_5.part)

    # Cut-Extrude11: cut by cut_extrude11_tool
    add(cut_extrude11_tool.part, mode=Mode.SUBTRACT)


solid = Compound([lpattern1_3.part, lpattern1_6.part, part_2.part, lpattern1_2_1.part, lpattern1_5_1.part])
